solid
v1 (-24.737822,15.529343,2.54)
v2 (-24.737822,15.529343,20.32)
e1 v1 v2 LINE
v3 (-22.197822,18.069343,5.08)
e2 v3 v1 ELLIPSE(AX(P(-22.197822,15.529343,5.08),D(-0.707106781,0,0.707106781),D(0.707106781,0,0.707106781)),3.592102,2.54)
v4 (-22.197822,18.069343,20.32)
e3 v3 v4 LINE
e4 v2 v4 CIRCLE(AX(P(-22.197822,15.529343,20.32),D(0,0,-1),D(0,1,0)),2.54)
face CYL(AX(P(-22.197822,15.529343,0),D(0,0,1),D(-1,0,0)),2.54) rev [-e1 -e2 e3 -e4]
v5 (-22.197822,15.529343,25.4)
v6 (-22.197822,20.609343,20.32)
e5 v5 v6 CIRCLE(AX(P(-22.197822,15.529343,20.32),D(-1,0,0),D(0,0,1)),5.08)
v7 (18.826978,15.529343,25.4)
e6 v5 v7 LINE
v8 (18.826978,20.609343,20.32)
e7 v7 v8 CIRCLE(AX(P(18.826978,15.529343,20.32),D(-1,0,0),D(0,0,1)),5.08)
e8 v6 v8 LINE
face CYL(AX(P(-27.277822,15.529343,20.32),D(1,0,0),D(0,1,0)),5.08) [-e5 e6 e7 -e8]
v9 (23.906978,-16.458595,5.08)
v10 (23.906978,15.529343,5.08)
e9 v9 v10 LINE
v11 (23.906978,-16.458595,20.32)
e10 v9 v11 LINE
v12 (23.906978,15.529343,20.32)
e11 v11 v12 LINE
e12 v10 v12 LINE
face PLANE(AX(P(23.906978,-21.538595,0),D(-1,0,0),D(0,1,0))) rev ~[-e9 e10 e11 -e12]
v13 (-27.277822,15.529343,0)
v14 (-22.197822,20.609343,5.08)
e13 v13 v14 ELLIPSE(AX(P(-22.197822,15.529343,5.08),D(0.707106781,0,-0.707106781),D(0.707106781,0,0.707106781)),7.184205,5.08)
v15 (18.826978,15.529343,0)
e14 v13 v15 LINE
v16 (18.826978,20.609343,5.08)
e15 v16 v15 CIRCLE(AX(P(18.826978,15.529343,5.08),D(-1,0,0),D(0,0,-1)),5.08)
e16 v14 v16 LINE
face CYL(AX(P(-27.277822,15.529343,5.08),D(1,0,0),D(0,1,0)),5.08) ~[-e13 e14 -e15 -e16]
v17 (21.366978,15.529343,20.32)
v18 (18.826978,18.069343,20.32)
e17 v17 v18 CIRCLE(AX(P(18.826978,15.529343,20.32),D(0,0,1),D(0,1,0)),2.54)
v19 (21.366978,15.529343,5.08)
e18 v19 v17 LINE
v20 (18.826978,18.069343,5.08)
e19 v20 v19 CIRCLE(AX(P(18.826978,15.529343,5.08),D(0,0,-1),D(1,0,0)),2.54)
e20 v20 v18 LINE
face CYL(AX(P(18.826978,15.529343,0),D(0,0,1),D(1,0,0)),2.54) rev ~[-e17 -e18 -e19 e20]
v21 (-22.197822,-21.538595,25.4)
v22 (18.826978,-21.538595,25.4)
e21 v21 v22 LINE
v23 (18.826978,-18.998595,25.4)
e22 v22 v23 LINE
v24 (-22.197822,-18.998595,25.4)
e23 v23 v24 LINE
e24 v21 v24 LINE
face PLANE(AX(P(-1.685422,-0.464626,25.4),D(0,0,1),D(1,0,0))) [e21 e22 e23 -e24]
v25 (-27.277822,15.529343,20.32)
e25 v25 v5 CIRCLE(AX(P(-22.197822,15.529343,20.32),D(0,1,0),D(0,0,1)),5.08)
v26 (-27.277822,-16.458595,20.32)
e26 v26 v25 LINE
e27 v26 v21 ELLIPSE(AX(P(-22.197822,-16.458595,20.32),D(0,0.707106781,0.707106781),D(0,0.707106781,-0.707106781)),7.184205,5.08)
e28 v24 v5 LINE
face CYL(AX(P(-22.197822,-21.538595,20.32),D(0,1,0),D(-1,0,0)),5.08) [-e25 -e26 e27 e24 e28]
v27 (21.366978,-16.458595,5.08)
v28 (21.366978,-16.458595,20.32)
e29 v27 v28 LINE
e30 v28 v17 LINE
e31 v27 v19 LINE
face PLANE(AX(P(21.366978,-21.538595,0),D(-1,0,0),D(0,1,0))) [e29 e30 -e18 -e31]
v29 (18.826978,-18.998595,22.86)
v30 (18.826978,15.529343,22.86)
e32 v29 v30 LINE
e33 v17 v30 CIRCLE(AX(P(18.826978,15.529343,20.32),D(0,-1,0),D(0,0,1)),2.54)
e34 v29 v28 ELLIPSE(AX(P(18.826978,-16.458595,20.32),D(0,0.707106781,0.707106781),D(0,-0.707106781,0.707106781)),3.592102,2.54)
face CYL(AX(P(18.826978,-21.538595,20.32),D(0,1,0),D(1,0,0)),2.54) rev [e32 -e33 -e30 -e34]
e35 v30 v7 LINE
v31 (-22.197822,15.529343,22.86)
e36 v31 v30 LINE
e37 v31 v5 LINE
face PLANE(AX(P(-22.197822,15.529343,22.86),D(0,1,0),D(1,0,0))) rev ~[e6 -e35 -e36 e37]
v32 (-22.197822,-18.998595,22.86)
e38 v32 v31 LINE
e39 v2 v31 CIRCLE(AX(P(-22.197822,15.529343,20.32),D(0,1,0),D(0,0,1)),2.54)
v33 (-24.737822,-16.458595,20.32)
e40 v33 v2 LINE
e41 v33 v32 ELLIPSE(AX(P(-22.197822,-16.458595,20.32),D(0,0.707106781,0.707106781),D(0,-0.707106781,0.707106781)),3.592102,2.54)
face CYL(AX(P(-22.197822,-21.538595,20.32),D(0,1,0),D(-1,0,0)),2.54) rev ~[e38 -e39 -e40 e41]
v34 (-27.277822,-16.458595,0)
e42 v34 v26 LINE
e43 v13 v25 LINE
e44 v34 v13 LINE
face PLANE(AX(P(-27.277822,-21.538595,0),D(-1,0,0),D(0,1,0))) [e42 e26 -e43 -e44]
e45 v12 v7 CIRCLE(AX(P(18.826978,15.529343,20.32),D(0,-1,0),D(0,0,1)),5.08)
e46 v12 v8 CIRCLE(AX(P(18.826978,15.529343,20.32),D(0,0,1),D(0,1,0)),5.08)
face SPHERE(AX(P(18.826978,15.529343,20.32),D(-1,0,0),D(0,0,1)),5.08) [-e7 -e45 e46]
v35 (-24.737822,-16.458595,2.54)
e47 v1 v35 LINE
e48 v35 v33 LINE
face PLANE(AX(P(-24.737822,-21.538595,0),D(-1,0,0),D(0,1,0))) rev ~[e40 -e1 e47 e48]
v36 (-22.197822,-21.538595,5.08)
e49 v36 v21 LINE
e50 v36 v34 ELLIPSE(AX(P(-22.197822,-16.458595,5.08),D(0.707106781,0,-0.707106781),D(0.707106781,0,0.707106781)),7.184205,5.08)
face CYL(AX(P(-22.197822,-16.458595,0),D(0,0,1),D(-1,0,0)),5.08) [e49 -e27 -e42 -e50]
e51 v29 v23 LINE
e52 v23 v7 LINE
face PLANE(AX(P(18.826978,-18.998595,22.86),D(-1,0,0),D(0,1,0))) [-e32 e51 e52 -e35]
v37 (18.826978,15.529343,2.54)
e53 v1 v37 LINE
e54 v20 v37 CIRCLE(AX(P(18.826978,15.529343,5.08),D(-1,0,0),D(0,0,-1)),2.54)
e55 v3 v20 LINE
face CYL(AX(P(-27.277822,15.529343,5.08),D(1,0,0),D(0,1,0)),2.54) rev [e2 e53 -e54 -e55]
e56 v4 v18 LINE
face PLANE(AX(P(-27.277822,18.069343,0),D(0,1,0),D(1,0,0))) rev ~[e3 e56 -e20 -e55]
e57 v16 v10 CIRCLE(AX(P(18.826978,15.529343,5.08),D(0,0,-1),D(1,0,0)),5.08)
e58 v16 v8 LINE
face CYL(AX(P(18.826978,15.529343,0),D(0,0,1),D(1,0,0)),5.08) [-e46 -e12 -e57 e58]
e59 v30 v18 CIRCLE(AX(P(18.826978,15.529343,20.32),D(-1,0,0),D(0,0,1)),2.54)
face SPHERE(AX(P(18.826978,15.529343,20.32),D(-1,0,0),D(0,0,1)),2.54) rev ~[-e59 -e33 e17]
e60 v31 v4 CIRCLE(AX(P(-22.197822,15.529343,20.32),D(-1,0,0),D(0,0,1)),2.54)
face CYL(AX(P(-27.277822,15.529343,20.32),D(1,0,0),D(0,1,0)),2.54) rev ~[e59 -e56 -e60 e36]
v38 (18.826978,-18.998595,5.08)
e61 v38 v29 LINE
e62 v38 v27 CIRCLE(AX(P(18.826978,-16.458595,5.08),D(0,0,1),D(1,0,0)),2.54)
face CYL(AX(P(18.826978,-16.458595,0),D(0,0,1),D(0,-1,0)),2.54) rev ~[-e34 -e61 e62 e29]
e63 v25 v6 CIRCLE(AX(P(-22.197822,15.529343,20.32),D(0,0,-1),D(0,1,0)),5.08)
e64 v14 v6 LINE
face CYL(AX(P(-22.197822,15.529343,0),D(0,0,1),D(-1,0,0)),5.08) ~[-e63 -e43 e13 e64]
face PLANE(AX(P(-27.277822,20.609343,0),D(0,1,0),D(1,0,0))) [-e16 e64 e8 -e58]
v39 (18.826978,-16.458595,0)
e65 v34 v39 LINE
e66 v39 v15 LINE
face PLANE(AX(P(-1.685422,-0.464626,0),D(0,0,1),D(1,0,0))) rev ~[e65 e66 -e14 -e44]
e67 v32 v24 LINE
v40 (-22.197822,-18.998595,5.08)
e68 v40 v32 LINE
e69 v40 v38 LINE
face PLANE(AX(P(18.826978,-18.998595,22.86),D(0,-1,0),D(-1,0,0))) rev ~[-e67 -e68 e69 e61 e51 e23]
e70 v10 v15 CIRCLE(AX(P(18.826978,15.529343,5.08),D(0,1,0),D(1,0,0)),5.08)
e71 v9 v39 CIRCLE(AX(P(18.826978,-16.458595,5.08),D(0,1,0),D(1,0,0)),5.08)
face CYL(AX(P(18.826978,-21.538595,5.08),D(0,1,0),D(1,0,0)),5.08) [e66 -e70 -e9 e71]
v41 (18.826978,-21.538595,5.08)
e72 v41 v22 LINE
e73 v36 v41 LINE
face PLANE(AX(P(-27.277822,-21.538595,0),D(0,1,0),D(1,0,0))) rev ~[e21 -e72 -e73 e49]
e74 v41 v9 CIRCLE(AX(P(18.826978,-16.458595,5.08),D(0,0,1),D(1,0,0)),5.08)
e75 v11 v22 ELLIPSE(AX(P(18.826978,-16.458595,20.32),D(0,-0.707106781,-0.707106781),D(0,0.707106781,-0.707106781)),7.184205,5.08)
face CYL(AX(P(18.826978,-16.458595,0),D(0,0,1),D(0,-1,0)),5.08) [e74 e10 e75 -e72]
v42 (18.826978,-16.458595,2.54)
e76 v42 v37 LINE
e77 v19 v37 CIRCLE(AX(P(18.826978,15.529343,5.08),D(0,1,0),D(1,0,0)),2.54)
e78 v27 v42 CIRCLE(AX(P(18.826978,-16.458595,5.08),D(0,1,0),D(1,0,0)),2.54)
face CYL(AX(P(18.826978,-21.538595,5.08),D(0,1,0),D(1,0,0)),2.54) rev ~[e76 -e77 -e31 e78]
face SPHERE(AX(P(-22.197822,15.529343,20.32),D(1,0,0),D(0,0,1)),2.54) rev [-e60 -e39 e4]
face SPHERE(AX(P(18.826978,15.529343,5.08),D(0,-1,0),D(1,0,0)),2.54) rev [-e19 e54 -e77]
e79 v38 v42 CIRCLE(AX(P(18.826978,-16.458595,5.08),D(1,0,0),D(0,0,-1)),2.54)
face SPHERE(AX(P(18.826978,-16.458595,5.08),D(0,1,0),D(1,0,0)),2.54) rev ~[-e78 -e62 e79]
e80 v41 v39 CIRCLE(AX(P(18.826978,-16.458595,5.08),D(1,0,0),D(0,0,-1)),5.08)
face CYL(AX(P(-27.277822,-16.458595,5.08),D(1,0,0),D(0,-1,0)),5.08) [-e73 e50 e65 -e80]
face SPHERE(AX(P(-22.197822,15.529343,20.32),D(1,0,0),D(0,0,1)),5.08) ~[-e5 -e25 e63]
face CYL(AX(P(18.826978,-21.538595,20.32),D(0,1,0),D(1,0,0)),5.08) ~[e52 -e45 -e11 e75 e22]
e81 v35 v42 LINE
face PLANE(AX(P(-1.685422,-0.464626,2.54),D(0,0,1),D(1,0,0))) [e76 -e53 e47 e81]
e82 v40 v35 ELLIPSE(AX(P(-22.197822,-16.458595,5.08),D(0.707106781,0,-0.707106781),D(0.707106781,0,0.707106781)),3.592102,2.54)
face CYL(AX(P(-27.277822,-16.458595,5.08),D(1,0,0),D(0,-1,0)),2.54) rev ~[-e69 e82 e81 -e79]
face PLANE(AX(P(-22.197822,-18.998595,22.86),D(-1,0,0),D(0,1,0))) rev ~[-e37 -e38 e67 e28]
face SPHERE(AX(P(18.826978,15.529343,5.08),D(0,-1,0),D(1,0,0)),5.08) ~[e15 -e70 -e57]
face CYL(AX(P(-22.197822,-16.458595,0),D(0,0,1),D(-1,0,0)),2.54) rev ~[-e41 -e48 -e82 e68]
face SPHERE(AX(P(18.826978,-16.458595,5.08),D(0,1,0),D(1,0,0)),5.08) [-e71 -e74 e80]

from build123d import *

# Parameters (mm, degrees)
F0_W     = 51.1847995222
F0_H     = 42.1479381621
F1_DEPTH = 25.4
F2_R     = 5.08
F3_T     = -2.54


# Not quite as in the source:
# - a shell that OpenCascade refuses in one call is made with other operations: the cavity is built on its own and cut out


with BuildPart() as f1:
    # F0 (on Top) → F1 (new body)
    with BuildSketch(Plane.XY):
        with Locations((-1.6854219139, -0.4646256566)):
            Rectangle(F0_W, F0_H)
    extrude(amount=F1_DEPTH)

    # F2
    f2_edges = [f1.edges().sort_by_distance(p)[0] for p in [
        (-1.685422, 20.609343, 25.4),
        (-27.277822, -0.464626, 25.4),
        (23.906978, -0.464626, 25.4),
        (23.906978, -0.464626, 0),
        (23.906978, 20.609343, 12.7),
        (23.906978, -21.538595, 12.7),
        (-27.277822, 20.609343, 12.7),
        (-1.685422, -21.538595, 0),
        (-27.277822, -21.538595, 12.7),
        (-1.685422, 20.609343, 0),
    ]]
    fillet(f2_edges, radius=F2_R)

    # F3: a shell. OpenCascade refuses it in one call, so the cavity is built on its own and cut out:
    # the body offset inwards by the wall thickness, plus a prism from it out through each open face.
    f3_core = offset(f1.part, amount=F3_T, mode=Mode.PRIVATE)
    f3_exits = [f3_core.faces().sort_by_distance(p)[0] for p in [
        (-1.685422, -1.734626, 22.86),
    ]]
    add(f3_core, mode=Mode.SUBTRACT)
    extrude(f3_exits, amount=-F3_T, mode=Mode.SUBTRACT)


solid = f1.part
